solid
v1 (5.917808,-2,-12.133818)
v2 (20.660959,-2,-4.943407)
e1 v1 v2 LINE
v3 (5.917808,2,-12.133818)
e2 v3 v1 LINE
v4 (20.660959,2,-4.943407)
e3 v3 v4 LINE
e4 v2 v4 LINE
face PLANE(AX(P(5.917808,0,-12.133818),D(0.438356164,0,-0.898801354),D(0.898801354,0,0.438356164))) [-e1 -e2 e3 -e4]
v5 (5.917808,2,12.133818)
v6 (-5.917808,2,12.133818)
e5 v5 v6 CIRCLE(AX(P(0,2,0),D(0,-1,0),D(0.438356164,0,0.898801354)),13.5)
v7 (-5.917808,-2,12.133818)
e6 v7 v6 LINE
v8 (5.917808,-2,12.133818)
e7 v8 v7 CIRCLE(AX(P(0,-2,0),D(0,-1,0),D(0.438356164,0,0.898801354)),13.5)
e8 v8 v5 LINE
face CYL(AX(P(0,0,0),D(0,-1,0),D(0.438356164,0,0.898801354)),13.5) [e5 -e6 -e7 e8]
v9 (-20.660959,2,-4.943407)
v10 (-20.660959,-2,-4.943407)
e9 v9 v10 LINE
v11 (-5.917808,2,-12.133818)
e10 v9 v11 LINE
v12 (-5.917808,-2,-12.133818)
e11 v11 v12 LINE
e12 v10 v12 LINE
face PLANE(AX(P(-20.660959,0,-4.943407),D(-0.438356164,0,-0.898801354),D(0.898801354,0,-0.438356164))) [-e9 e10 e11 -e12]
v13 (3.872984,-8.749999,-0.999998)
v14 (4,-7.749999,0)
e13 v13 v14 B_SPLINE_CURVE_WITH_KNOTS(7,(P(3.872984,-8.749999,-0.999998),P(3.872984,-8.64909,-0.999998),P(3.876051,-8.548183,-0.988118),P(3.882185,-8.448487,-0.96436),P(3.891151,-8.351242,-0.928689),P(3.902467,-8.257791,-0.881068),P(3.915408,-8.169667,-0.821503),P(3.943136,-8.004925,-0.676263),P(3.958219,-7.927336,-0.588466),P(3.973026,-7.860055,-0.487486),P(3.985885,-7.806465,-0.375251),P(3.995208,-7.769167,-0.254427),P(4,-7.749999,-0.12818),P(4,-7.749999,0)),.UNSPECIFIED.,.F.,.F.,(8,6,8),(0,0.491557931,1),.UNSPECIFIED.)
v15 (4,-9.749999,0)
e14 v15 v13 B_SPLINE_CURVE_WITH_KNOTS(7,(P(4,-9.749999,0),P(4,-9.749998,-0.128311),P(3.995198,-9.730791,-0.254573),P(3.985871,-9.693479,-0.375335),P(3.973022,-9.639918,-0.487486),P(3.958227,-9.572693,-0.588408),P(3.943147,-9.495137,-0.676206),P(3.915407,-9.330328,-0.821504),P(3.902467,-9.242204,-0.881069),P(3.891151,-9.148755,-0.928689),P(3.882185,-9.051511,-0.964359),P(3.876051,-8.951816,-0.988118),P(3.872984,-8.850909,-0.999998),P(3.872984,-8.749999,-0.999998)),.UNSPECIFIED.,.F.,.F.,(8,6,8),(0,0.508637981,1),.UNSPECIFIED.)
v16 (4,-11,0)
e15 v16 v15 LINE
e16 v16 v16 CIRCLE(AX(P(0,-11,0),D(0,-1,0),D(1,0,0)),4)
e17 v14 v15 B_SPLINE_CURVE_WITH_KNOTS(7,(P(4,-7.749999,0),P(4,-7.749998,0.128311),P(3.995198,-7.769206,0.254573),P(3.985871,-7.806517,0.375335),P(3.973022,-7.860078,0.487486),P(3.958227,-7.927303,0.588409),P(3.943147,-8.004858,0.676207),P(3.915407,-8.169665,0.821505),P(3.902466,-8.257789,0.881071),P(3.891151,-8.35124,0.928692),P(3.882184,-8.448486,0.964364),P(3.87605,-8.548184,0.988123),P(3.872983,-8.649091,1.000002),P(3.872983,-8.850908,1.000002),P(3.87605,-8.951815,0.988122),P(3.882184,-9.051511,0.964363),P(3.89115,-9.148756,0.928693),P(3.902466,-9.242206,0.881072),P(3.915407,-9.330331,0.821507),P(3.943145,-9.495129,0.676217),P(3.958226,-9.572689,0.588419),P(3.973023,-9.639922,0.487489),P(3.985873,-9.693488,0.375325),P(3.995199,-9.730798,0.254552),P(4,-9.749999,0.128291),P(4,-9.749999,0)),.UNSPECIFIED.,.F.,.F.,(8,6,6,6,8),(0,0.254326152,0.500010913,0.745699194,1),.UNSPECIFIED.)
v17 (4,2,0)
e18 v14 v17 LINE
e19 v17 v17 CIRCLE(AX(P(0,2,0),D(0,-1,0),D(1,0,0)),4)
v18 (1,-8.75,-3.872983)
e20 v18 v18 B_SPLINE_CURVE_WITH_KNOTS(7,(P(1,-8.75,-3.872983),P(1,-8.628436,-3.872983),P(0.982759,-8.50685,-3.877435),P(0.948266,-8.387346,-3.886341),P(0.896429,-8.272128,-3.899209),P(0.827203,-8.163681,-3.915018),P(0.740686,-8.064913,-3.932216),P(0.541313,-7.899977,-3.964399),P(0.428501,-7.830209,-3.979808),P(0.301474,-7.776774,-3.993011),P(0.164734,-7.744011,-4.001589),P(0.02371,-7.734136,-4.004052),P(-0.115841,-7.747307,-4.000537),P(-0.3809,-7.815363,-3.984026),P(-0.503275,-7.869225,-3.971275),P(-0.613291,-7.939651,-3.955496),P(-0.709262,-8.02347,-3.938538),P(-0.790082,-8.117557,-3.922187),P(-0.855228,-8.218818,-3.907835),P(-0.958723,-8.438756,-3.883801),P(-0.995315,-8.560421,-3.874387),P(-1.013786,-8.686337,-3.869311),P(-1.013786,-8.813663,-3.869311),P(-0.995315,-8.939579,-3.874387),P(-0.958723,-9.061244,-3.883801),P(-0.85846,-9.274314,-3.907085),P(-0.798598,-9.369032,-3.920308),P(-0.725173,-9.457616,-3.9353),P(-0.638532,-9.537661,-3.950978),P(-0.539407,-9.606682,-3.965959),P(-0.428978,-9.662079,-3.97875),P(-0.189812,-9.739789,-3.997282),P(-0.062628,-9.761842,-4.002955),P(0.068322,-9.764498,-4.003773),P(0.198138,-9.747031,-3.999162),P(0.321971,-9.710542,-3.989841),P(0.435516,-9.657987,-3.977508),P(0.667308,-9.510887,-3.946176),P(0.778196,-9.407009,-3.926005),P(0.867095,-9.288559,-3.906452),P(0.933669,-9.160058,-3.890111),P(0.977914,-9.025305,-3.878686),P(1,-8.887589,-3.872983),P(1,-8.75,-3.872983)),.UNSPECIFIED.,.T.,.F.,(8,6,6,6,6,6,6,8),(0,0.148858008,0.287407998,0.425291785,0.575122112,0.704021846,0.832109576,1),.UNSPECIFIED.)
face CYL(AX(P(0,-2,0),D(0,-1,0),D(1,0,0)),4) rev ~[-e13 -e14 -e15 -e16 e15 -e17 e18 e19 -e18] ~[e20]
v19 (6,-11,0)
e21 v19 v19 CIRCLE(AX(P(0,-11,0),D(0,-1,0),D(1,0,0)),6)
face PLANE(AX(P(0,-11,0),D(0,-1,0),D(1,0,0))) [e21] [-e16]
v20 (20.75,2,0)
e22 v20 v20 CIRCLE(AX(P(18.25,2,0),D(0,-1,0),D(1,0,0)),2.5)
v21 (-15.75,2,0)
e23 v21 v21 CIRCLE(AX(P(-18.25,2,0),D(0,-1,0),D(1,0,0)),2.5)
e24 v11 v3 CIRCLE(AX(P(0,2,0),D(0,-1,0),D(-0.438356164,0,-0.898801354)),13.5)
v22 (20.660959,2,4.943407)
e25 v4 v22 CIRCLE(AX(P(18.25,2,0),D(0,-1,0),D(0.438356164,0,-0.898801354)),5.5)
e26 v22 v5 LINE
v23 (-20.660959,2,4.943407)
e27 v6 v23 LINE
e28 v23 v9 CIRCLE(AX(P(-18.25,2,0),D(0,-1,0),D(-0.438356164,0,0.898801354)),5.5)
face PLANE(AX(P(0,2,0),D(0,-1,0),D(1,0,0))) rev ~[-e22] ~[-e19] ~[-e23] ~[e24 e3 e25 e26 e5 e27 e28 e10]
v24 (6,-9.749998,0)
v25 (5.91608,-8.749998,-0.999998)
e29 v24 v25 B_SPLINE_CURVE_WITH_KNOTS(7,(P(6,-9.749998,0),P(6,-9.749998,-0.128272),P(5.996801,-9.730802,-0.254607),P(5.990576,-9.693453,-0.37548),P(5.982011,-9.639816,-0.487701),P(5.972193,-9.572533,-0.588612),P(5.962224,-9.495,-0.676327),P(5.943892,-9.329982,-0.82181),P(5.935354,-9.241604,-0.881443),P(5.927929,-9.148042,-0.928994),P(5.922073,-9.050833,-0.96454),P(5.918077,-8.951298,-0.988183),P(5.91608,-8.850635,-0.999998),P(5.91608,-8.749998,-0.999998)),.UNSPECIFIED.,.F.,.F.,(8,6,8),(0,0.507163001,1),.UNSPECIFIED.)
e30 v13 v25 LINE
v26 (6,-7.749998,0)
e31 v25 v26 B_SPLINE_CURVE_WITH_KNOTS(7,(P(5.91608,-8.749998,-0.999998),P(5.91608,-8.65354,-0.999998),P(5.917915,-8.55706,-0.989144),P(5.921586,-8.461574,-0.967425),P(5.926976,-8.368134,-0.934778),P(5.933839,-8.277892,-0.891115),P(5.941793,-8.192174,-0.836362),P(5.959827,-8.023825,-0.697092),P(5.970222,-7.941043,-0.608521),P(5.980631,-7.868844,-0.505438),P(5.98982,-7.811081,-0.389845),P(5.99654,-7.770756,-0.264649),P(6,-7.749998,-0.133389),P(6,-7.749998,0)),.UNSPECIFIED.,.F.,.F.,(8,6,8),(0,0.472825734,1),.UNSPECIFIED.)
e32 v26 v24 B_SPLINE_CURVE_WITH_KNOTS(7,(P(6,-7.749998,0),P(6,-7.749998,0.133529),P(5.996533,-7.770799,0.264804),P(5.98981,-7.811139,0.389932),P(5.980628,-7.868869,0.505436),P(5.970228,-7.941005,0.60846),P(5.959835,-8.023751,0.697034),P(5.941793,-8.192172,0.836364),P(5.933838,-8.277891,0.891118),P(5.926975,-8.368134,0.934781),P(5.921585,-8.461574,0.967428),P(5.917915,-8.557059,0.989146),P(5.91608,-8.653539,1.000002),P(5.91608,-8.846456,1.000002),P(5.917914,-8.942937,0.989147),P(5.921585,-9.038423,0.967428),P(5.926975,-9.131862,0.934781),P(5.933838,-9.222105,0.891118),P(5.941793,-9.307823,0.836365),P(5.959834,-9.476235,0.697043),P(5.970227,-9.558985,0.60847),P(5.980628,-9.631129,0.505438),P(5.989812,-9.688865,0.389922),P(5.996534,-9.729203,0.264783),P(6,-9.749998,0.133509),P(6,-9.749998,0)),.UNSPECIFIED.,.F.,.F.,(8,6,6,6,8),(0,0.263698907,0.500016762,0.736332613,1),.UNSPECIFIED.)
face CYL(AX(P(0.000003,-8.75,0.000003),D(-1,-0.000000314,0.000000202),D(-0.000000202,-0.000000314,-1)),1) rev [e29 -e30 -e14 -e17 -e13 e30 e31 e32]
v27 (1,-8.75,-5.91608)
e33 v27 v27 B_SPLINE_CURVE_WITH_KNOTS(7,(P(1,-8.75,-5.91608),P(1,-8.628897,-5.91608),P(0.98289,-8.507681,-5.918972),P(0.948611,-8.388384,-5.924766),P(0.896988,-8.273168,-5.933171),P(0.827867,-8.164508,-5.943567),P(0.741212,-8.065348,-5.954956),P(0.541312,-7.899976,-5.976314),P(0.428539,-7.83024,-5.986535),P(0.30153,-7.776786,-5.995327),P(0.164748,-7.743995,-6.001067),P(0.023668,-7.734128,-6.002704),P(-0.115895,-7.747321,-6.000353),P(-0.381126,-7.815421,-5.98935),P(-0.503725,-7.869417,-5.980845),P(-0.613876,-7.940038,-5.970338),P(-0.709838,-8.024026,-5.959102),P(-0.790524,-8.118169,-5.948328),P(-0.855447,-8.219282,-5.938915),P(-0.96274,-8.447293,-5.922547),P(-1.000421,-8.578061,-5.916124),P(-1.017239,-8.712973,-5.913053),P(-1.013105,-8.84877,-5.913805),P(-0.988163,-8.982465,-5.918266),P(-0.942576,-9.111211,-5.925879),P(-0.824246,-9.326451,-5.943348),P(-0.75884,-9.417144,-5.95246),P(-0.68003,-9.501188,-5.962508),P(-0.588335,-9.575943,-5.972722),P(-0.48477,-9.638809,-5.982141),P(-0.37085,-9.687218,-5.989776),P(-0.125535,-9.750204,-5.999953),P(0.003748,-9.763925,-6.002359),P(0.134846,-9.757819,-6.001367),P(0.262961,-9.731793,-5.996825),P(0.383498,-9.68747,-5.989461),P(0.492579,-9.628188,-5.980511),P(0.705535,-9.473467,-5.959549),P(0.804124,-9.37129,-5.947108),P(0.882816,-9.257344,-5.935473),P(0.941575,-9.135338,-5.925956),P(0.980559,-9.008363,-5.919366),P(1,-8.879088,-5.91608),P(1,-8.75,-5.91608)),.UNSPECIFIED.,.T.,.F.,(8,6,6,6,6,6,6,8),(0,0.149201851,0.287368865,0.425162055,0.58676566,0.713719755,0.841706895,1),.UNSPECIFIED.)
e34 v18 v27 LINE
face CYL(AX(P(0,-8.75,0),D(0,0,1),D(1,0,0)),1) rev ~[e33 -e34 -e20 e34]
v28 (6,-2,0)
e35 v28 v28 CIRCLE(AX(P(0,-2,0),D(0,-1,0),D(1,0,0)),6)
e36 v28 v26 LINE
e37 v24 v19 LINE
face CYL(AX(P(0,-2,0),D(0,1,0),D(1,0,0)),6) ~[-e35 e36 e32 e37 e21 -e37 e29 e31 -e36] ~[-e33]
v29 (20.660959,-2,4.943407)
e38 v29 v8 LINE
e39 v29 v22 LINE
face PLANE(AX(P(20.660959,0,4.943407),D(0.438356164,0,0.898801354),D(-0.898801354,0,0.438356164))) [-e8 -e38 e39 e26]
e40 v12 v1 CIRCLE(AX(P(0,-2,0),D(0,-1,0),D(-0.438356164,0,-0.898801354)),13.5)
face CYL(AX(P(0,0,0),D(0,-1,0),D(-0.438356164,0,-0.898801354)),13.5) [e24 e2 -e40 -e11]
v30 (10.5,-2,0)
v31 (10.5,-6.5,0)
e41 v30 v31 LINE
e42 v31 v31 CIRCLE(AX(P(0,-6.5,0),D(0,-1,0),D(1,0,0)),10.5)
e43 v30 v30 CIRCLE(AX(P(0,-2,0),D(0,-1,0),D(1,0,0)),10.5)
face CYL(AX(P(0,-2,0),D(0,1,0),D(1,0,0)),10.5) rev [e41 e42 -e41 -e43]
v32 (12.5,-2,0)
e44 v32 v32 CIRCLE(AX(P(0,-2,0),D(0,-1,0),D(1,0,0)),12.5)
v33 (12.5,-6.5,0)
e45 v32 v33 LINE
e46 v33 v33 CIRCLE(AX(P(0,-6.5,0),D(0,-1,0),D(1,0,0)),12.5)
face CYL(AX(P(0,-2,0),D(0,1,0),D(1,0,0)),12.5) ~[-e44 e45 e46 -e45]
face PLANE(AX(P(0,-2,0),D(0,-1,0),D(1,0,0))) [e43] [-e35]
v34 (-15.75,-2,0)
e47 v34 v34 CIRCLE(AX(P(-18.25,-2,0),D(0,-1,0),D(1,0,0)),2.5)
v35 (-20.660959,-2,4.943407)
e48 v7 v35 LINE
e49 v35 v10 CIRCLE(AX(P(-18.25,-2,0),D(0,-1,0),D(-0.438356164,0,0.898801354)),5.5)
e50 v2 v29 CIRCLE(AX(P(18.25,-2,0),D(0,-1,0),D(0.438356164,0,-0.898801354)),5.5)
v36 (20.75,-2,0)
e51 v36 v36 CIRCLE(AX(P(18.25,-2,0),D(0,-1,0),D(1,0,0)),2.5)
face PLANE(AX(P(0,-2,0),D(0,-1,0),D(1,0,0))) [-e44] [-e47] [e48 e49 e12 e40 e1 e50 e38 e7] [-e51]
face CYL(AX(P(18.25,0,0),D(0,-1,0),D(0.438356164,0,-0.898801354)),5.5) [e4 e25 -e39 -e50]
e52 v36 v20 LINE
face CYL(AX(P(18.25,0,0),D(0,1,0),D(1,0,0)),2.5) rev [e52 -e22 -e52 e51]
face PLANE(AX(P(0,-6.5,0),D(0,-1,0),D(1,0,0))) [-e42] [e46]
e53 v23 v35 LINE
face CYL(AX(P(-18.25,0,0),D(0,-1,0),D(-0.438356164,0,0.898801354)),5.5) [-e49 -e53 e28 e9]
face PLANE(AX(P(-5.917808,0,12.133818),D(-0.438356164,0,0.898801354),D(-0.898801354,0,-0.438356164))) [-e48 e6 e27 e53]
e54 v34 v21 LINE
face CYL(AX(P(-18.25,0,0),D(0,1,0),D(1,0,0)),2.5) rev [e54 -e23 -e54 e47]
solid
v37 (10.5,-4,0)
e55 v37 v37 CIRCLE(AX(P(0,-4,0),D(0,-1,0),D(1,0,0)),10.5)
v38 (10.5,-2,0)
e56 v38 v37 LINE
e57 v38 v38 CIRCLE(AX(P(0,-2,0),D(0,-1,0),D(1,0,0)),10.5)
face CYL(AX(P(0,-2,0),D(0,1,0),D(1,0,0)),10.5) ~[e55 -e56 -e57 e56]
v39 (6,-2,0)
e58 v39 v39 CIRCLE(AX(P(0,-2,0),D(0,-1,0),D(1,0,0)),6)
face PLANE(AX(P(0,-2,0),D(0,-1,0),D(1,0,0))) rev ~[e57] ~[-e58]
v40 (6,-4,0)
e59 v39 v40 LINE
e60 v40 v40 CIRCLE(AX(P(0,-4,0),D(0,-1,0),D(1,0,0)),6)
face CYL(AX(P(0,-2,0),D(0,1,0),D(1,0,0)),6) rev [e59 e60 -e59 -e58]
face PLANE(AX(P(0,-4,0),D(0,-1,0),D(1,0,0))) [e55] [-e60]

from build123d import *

# Parameters (mm, degrees)
F0_R     = 2.5
F1_DEPTH = 2
F2_R     = 12.5
F2_R_2   = 10.5
F3_DEPTH = 4.5
F4_R     = 6
F4_R_2   = 4
F5_DEPTH = 9
F6_DEPTH = 4.001
F7_DEPTH = 2
F8_R     = 1
F9_DEPTH = 13.501


# Not quite as in the source:
# - a pattern or mirror of a feature is missing from the dataset's text; its kind, count and spacing are read off the source's solid


with BuildPart() as f1:
    # F0 (on Front) → F1 (new body, symmetric)
    with BuildSketch(Plane.XZ):
        with BuildLine():
            Line((-5.9178082192, 12.133818273), (-20.6609589041, 4.9434074445))
            ThreePointArc((-20.6609589041, 4.9434074445), (-23.75, 0), (-20.6609589041, -4.9434074445))
            Line((-20.6609589041, -4.9434074445), (-5.9178082192, -12.133818273))
            ThreePointArc((-5.9178082192, -12.133818273), (0, -13.5), (5.9178082192, -12.133818273))
            Line((5.9178082192, -12.133818273), (20.6609589041, -4.9434074445))
            ThreePointArc((20.6609589041, -4.9434074445), (23.75, 0), (20.6609589041, 4.9434074445))
            Line((20.6609589041, 4.9434074445), (5.9178082192, 12.133818273))
            ThreePointArc((5.9178082192, 12.133818273), (0, 13.5), (-5.9178082192, 12.133818273))
        make_face()
        with Locations((-18.25, 0)):
            Circle(F0_R, mode=Mode.SUBTRACT)
        with Locations((18.25, 0)):
            Circle(F0_R, mode=Mode.SUBTRACT)
    extrude(amount=F1_DEPTH, both=True)

    # F2 (on face) → F3 (join)
    with BuildSketch(Plane.XZ.offset(2)):
        Circle(F2_R)
        Circle(F2_R_2, mode=Mode.SUBTRACT)
    extrude(amount=F3_DEPTH)

    # F4 (on face) → F5 (join)
    with BuildSketch(Plane.XZ.offset(2)):
        Circle(F4_R)
        Circle(F4_R_2, mode=Mode.SUBTRACT)
    extrude(amount=F5_DEPTH)

    # F4 (on face) → F6 (cut, through all)
    with BuildSketch(Plane.XZ.offset(2)):
        Circle(F4_R_2)
    extrude(amount=-F6_DEPTH, mode=Mode.SUBTRACT)


with BuildPart() as f7:
    # F7 (new): a face of the model
    f7_faces = [f1.part.faces().sort_by_distance(p)[0] for p in [
        (-10.2030151519, -2, 0),
    ]]
    extrude(f7_faces, amount=F7_DEPTH)


with BuildPart() as f1_1:
    add(f1.part)

    # F8 (on Top) → F9 (cut, through all)
    with BuildSketch(Plane.XY):
        with Locations((0, -8.75)):
            Circle(F8_R)
    f9 = extrude(amount=-F9_DEPTH, mode=Mode.SUBTRACT)

    # F9_copies: F9 across plane
    add(f9.mirror(Plane(origin=(0, 0, 0), x_dir=(-0.7071067098, 0, 0.7071068526), z_dir=(0.7071068526, 2.218e-07, 0.7071067098))), mode=Mode.SUBTRACT)


solid = Compound([f7.part, f1_1.part])
